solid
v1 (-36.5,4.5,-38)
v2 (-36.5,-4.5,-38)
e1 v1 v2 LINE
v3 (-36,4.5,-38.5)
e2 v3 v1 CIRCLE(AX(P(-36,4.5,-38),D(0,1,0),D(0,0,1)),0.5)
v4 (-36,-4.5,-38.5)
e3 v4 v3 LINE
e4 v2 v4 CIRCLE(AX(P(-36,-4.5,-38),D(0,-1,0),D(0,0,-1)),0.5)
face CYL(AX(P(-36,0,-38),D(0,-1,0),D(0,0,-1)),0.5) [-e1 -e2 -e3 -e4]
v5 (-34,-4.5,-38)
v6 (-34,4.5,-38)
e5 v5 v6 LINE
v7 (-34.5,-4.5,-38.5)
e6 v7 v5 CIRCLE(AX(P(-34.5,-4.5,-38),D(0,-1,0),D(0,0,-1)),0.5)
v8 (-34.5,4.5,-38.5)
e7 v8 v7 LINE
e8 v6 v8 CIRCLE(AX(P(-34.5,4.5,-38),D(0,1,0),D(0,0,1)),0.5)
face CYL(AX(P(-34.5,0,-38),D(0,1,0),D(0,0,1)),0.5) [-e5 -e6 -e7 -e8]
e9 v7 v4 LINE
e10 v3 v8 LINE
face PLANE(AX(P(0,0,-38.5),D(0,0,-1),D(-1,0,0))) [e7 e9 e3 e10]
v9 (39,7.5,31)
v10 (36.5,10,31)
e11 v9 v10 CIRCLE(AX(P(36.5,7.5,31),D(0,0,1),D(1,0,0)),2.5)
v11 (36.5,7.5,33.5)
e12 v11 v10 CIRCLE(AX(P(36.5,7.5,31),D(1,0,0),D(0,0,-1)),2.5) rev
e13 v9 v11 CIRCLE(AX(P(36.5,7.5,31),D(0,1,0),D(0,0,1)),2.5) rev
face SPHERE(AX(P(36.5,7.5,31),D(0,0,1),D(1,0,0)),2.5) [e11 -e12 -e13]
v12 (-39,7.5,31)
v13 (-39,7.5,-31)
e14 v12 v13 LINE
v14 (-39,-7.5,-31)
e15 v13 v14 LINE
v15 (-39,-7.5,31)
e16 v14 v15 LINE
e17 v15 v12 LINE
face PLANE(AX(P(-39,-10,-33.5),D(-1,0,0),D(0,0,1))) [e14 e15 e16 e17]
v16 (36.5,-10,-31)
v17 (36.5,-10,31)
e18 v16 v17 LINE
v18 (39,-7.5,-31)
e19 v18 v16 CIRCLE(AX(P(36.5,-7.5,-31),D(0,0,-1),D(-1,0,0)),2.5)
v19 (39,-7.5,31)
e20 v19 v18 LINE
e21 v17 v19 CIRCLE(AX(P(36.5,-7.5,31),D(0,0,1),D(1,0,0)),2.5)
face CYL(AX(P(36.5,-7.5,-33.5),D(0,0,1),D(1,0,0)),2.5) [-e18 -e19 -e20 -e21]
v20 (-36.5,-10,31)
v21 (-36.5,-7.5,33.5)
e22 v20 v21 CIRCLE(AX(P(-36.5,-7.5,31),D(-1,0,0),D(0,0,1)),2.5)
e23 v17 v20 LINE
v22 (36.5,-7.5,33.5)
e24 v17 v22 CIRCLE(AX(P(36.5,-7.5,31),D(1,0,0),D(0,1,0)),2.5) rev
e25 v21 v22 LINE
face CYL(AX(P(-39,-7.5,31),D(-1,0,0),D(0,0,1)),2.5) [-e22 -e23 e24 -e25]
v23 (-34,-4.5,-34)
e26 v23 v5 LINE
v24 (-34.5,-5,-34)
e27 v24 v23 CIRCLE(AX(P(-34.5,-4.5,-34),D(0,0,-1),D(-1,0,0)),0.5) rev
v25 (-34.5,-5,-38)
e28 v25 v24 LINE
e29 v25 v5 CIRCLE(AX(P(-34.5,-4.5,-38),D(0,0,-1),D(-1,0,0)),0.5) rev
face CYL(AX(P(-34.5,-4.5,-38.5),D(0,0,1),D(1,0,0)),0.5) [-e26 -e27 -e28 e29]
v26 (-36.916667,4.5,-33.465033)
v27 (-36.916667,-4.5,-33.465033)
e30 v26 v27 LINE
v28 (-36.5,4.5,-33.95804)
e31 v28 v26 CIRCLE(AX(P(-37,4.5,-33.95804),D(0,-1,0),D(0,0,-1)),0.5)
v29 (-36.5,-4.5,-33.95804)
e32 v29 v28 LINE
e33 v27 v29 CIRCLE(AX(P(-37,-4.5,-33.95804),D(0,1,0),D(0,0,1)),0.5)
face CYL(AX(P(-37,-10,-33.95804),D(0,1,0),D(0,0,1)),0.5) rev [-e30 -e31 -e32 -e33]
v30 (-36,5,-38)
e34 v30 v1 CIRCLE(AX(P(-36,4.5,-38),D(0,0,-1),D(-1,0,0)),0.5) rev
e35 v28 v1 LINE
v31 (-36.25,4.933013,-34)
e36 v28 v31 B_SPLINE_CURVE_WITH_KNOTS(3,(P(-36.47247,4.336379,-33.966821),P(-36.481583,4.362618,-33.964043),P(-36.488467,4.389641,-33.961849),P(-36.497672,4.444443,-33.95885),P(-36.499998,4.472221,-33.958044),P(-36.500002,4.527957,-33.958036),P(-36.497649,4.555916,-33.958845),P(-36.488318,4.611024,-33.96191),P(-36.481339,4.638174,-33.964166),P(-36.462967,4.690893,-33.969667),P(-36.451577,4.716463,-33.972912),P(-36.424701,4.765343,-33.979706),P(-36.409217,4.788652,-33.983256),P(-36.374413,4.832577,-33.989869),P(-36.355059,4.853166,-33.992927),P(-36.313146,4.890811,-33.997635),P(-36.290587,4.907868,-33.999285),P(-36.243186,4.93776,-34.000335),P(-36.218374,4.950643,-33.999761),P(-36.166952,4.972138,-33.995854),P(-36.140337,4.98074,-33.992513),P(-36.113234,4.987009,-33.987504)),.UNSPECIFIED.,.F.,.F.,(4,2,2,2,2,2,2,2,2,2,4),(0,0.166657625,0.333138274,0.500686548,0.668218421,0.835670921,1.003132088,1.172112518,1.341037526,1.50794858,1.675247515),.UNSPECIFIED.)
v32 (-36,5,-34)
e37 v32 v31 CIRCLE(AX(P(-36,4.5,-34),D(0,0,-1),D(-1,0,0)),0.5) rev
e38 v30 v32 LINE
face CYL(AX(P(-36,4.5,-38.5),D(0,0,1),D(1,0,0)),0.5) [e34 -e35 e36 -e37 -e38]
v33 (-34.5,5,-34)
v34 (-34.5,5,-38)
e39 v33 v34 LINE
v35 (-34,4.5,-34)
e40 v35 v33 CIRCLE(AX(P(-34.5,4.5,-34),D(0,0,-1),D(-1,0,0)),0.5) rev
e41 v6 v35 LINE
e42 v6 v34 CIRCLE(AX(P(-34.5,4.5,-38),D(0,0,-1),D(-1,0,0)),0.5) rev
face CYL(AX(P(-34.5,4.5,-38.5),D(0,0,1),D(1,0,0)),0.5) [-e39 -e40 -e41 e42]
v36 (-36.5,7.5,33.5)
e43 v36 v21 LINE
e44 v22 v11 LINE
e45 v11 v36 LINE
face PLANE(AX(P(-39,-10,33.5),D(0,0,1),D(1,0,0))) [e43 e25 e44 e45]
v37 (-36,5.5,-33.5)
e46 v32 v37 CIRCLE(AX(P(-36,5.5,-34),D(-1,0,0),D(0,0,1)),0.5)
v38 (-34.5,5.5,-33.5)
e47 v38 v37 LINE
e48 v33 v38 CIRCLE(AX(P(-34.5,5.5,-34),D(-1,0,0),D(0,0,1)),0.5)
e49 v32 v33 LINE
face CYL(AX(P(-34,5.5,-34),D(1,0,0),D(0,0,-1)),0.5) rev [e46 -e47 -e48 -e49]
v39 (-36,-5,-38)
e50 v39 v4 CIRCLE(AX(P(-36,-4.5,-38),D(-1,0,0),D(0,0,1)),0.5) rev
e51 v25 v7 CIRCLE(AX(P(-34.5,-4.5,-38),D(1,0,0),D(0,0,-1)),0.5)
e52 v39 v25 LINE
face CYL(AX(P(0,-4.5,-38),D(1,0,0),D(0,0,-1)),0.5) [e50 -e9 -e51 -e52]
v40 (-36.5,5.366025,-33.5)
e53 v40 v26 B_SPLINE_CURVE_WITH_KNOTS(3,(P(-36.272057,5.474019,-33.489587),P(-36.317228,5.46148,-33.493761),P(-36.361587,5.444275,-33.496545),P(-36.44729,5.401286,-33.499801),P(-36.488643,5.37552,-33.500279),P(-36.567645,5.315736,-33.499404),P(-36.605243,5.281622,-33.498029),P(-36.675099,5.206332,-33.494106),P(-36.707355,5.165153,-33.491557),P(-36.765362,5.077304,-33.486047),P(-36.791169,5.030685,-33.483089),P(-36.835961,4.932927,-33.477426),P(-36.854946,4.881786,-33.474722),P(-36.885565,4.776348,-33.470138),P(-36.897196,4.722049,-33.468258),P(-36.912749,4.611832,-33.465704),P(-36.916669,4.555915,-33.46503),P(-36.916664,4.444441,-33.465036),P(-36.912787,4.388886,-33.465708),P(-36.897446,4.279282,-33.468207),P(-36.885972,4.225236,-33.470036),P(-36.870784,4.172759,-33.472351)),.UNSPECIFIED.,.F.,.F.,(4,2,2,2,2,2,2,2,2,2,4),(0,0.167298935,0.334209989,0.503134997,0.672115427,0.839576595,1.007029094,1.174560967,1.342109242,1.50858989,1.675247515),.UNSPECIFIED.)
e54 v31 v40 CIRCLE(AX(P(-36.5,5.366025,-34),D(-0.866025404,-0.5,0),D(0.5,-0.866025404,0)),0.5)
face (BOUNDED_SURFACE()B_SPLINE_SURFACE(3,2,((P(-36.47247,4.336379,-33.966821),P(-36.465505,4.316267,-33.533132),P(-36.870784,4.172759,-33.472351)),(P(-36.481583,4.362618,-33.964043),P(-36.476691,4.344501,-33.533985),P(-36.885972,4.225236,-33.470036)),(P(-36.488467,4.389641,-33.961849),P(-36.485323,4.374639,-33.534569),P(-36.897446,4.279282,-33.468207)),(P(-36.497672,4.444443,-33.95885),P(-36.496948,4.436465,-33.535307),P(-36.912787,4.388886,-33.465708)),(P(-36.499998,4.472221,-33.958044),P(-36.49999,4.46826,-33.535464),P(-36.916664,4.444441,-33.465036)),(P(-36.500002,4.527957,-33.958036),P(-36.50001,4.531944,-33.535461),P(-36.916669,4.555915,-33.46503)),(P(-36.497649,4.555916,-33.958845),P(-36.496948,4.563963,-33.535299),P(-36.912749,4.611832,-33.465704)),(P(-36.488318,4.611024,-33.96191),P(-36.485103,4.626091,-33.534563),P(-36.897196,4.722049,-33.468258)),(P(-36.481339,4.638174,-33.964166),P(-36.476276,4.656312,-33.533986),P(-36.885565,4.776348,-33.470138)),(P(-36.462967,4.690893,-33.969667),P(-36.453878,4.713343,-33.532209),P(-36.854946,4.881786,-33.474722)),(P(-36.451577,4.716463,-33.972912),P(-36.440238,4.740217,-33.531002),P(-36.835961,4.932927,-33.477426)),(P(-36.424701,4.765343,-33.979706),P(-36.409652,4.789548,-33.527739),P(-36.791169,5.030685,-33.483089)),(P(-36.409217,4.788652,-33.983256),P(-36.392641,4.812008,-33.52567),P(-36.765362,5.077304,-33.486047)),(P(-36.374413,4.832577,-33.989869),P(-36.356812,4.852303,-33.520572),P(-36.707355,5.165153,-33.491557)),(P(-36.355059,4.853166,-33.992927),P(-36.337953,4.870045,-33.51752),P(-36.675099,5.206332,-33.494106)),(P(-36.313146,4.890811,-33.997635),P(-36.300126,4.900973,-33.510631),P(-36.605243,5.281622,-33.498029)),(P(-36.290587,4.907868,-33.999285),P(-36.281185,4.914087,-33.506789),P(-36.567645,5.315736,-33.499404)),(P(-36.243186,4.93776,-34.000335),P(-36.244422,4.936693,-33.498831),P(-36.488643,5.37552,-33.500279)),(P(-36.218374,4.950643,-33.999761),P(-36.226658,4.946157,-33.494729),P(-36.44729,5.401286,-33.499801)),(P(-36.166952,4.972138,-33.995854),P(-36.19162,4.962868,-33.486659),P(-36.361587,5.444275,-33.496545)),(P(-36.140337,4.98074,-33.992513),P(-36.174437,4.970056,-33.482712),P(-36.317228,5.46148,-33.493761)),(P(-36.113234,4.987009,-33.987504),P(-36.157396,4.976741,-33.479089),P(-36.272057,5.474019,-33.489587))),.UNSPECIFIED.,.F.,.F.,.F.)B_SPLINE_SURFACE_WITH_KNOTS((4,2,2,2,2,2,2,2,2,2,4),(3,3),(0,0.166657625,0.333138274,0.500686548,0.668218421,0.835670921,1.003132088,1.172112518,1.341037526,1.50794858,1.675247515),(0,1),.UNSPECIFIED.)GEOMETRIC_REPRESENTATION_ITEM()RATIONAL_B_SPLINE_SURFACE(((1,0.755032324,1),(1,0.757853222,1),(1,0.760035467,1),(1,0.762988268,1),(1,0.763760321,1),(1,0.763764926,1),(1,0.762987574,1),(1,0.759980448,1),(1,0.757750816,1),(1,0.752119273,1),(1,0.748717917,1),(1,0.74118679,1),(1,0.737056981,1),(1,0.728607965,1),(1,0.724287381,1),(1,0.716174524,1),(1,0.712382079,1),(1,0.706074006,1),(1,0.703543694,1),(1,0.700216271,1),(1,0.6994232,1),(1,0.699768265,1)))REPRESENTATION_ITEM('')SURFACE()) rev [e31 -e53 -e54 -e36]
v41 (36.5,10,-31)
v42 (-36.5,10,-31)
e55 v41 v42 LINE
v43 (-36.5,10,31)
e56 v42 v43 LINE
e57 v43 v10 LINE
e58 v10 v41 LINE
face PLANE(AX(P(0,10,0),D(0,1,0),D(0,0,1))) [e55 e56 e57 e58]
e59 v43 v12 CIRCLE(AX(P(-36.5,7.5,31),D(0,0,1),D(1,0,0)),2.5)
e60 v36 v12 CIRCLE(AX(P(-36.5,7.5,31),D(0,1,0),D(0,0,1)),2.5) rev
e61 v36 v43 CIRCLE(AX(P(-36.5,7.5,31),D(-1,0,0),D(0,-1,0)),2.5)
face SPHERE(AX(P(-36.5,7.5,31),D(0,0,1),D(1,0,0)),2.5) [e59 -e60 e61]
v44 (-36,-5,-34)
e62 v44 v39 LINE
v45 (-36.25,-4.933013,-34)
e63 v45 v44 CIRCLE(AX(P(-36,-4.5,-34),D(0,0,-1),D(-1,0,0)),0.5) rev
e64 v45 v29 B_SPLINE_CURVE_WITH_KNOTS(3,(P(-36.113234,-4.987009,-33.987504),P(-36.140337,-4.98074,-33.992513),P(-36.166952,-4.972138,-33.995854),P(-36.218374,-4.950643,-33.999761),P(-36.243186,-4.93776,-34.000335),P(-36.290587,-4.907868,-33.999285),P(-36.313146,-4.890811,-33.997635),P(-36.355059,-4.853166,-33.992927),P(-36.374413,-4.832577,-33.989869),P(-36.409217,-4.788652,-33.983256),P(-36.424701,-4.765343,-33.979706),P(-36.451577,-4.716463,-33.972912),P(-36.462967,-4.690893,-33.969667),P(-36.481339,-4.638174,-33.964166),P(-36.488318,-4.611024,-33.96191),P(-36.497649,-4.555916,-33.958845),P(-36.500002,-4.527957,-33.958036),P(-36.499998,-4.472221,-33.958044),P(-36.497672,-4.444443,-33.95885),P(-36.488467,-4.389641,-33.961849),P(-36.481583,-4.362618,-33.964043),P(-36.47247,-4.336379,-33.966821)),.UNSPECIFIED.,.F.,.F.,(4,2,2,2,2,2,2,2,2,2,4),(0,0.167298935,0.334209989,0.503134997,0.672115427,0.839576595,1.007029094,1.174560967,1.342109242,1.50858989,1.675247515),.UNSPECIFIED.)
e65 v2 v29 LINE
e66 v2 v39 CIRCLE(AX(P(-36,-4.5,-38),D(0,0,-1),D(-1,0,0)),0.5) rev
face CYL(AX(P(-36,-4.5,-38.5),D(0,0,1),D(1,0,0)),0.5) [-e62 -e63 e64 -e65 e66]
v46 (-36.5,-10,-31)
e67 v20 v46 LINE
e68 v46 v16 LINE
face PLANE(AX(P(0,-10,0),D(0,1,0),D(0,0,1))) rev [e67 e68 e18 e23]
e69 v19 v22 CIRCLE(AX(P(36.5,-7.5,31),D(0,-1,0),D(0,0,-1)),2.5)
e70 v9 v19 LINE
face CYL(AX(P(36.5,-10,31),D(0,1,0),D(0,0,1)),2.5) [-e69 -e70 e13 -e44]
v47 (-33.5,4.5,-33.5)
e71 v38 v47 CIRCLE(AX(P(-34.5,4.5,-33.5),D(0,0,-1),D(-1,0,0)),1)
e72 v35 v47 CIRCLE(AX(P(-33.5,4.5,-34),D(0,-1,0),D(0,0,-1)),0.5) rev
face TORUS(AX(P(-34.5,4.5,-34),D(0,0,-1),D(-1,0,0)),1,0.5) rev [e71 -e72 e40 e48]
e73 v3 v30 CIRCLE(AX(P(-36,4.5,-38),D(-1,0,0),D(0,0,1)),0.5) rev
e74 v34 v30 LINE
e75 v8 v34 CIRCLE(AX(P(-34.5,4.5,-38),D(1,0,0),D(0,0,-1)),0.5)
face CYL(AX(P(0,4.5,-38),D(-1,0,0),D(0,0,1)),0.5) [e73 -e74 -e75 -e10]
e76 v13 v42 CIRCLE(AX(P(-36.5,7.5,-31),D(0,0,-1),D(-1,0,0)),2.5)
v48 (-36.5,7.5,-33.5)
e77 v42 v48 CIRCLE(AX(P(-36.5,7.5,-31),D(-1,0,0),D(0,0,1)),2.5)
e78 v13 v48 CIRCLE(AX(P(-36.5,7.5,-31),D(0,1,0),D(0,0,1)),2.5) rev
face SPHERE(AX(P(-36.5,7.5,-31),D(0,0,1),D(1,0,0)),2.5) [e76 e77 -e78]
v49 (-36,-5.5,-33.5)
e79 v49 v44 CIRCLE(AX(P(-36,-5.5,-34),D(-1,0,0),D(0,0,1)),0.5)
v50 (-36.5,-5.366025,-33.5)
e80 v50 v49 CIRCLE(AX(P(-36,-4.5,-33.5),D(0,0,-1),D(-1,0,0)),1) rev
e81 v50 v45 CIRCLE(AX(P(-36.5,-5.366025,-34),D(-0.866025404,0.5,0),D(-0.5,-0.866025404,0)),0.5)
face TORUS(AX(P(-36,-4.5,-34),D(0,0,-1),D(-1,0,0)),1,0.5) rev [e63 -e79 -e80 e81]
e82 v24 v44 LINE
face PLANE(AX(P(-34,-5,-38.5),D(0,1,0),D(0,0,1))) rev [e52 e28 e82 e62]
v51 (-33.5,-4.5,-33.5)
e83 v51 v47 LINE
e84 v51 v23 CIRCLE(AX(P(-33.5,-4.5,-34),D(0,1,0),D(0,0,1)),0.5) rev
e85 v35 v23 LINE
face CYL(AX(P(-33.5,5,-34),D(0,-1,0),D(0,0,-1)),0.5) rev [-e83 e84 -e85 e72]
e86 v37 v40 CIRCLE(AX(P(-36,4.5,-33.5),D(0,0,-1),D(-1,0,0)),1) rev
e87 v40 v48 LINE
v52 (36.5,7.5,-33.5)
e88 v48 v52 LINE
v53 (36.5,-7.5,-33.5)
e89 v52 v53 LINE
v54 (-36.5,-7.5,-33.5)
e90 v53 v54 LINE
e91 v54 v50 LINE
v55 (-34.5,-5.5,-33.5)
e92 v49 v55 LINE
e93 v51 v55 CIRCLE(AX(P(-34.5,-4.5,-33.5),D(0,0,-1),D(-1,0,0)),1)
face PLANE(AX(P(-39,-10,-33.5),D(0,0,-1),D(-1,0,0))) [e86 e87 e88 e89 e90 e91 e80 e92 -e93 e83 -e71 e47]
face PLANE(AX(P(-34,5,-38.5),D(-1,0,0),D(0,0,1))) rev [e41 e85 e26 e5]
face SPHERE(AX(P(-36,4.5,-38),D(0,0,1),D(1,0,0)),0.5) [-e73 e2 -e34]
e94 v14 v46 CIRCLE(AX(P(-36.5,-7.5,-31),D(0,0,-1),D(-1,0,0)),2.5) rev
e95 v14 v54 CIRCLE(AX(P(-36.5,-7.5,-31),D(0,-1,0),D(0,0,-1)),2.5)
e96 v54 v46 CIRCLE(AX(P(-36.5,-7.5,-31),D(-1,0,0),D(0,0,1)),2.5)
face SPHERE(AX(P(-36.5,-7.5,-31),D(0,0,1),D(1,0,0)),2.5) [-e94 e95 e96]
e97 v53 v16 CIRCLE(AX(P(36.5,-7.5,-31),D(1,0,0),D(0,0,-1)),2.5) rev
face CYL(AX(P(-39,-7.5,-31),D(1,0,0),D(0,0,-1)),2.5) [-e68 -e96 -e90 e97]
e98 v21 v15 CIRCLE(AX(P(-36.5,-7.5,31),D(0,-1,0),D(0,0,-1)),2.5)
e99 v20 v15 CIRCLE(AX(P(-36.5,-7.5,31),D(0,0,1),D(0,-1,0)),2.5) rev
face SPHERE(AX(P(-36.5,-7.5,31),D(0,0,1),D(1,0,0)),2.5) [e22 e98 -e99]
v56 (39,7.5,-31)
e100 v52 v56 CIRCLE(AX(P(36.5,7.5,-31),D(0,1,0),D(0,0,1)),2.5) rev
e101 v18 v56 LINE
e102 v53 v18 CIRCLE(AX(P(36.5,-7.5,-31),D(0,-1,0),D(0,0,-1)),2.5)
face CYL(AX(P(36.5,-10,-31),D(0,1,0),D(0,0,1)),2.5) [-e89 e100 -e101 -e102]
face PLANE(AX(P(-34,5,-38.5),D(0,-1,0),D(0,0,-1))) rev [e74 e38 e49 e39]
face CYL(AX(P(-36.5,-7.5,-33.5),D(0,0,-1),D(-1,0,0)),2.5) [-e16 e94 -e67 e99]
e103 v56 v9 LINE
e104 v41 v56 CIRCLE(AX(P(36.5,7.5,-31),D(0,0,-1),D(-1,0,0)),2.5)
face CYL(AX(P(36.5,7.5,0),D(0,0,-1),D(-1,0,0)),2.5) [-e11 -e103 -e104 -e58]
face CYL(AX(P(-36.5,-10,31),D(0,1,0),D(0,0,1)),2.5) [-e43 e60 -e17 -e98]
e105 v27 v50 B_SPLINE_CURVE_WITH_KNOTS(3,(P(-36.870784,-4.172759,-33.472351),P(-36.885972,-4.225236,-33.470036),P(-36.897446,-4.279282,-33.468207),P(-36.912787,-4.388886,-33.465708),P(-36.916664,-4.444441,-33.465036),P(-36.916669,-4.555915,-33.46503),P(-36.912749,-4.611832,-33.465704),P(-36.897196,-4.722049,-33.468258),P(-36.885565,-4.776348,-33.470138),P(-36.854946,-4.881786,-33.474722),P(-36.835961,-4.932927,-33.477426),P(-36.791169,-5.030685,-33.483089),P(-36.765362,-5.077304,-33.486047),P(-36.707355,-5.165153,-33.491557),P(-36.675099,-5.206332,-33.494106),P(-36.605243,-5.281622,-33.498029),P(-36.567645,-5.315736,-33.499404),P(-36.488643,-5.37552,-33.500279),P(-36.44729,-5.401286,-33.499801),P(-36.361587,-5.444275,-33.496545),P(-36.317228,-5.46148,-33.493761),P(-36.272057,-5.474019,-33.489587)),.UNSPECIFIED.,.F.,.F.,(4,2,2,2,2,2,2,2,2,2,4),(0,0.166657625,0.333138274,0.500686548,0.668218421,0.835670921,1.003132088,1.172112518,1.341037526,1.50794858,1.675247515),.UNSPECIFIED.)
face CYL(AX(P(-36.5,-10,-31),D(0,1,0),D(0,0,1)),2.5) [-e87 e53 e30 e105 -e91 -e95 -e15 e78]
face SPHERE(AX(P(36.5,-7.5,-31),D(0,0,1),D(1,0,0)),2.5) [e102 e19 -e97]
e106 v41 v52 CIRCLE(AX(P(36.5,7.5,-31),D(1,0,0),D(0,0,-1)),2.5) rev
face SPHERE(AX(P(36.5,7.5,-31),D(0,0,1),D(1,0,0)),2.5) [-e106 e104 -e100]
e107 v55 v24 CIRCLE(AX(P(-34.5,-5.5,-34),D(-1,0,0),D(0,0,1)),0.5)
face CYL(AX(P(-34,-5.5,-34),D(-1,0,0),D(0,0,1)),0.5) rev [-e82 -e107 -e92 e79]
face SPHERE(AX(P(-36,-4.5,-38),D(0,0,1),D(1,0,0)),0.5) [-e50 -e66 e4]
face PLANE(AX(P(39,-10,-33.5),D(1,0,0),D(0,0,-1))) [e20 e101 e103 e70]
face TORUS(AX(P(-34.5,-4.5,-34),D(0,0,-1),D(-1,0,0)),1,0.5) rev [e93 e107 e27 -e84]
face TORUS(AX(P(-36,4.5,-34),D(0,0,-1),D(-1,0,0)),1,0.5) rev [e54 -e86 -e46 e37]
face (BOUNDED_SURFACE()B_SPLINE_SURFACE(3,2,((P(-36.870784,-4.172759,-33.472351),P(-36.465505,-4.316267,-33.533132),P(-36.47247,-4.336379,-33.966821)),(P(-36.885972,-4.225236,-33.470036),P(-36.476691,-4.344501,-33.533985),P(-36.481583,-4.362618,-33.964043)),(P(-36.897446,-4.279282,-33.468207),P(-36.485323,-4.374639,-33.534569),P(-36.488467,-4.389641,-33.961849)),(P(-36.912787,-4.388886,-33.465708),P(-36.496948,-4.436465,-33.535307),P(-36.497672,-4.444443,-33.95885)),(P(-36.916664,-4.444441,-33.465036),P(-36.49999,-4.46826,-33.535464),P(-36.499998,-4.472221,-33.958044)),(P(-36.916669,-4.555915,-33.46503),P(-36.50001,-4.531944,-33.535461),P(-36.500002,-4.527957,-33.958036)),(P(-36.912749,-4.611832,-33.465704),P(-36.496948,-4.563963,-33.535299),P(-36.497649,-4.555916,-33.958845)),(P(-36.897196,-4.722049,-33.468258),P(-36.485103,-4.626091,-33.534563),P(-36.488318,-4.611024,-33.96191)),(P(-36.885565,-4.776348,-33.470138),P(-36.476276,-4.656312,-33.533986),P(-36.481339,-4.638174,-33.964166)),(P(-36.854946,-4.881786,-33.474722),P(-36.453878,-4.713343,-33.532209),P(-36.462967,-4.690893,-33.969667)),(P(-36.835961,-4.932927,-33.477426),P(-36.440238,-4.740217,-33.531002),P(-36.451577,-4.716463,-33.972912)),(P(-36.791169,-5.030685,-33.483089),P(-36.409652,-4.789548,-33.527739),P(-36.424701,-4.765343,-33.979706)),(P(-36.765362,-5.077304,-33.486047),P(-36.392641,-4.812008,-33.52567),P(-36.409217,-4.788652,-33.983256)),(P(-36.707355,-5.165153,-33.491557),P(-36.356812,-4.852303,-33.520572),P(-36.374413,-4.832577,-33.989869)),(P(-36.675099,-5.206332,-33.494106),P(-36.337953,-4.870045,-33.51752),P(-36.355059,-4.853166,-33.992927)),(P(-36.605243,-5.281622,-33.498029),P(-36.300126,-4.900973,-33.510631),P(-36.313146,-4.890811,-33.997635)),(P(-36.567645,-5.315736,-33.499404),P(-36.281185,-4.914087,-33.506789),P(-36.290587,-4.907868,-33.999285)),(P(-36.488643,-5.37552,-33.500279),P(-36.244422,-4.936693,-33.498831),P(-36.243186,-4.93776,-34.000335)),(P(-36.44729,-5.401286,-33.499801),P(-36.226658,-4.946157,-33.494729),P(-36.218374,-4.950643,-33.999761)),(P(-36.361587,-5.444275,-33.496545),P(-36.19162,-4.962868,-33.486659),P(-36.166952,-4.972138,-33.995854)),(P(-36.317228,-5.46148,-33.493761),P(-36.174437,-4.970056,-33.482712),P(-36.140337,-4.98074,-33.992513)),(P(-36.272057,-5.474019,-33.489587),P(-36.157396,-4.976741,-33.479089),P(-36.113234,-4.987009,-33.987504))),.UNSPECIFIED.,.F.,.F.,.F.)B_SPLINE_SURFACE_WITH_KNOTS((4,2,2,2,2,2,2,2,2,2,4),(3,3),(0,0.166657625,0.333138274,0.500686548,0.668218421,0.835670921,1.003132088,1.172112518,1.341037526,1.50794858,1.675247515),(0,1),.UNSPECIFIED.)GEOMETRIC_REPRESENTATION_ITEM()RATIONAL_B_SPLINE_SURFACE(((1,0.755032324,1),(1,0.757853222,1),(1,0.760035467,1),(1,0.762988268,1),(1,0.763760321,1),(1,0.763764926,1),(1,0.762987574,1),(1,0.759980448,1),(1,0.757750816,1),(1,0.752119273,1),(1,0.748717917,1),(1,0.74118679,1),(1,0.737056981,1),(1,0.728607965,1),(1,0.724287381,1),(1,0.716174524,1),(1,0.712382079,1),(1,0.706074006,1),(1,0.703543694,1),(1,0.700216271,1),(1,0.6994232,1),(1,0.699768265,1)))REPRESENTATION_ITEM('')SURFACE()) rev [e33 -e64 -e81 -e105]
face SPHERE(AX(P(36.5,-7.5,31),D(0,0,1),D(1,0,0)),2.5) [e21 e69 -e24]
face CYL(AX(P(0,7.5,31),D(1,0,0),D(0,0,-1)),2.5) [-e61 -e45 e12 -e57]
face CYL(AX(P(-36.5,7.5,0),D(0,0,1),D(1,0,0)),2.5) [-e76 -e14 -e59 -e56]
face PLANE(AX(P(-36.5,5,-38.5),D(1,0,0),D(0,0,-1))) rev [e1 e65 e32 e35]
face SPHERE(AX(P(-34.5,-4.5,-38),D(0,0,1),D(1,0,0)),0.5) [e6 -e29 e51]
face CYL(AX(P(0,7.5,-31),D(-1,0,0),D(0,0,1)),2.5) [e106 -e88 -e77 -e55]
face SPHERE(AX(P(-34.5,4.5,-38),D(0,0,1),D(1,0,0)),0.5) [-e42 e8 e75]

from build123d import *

# Parameters (mm, degrees)
BOSS_EXTRUDE1_DEPTH      = 10
BOSS_EXTRUDE1_DEPTH_BACK = 10
SKETCH1_W                = 78
SKETCH1_H                = 67
FILLET1_R                = 2.5
SKETCH2_W                = 2.5
SKETCH2_H                = 10
BOSS_EXTRUDE2_DEPTH      = 5
FILLET2_R                = 0.5


with BuildPart() as part:
    # Sketch1 → Boss-Extrude1 (new, two sides: drawn at the far end of the back side and taken through both)
    with BuildSketch(Plane(origin=(0, 0, 0), x_dir=(1, 0, 0), z_dir=(0, 1, 0)).offset(-BOSS_EXTRUDE1_DEPTH_BACK)):
        Rectangle(SKETCH1_W, SKETCH1_H)
    extrude(amount=BOSS_EXTRUDE1_DEPTH + BOSS_EXTRUDE1_DEPTH_BACK)

    # Fillet1
    fillet1_edges = [part.edges().sort_by_distance(p)[0] for p in [
        (-39, -10, 0),
        (39, 10, 0),
        (0, 10, -33.5),
        (0, -10, 33.5),
        (-39, 10, 0),
        (0, 10, 33.5),
        (39, -10, 0),
        (0, -10, -33.5),
        (39, 0, 33.5),
        (-39, 0, 33.5),
        (-39, 0, -33.5),
        (39, 0, -33.5),
    ]]
    fillet(fillet1_edges, radius=FILLET1_R)

    # Sketch2 → Boss-Extrude2 (add)
    with BuildSketch(Plane(origin=(0, 0, -33.5), x_dir=(-1, 0, 0), z_dir=(0, 0, -1))):
        with Locations((35.25, 0)):
            Rectangle(SKETCH2_W, SKETCH2_H)
    extrude(amount=BOSS_EXTRUDE2_DEPTH)

    # Fillet2
    fillet2_edges = [part.edges().sort_by_distance(p)[0] for p in [
        (-34, -5, -36),
        (-35.25, -5, -38.5),
        (-34, 0, -38.5),
        (-35.25, 5, -38.5),
        (-34, 5, -36),
        (-36.5, -5, -36),
        (-36.5, 0, -38.5),
        (-36.5, 5, -36),
    ]]
    fillet(fillet2_edges, radius=FILLET2_R)
    fillet2_2_edges = [part.edges().sort_by_distance(p)[0] for p in [
        (-34, 0, -33.5),
        (-35.25, -5, -33.5),
        (-35.25, 5, -33.5),
        (-36.5, 0, -33.5),
        (-36.353553391, 4.853553391, -33.5),
        (-36.353553391, -4.853553391, -33.5),
        (-34.146446609, 4.853553391, -33.5),
        (-34.146446609, -4.853553391, -33.5),
    ]]
    fillet(fillet2_2_edges, radius=FILLET2_R)


solid = part.part
